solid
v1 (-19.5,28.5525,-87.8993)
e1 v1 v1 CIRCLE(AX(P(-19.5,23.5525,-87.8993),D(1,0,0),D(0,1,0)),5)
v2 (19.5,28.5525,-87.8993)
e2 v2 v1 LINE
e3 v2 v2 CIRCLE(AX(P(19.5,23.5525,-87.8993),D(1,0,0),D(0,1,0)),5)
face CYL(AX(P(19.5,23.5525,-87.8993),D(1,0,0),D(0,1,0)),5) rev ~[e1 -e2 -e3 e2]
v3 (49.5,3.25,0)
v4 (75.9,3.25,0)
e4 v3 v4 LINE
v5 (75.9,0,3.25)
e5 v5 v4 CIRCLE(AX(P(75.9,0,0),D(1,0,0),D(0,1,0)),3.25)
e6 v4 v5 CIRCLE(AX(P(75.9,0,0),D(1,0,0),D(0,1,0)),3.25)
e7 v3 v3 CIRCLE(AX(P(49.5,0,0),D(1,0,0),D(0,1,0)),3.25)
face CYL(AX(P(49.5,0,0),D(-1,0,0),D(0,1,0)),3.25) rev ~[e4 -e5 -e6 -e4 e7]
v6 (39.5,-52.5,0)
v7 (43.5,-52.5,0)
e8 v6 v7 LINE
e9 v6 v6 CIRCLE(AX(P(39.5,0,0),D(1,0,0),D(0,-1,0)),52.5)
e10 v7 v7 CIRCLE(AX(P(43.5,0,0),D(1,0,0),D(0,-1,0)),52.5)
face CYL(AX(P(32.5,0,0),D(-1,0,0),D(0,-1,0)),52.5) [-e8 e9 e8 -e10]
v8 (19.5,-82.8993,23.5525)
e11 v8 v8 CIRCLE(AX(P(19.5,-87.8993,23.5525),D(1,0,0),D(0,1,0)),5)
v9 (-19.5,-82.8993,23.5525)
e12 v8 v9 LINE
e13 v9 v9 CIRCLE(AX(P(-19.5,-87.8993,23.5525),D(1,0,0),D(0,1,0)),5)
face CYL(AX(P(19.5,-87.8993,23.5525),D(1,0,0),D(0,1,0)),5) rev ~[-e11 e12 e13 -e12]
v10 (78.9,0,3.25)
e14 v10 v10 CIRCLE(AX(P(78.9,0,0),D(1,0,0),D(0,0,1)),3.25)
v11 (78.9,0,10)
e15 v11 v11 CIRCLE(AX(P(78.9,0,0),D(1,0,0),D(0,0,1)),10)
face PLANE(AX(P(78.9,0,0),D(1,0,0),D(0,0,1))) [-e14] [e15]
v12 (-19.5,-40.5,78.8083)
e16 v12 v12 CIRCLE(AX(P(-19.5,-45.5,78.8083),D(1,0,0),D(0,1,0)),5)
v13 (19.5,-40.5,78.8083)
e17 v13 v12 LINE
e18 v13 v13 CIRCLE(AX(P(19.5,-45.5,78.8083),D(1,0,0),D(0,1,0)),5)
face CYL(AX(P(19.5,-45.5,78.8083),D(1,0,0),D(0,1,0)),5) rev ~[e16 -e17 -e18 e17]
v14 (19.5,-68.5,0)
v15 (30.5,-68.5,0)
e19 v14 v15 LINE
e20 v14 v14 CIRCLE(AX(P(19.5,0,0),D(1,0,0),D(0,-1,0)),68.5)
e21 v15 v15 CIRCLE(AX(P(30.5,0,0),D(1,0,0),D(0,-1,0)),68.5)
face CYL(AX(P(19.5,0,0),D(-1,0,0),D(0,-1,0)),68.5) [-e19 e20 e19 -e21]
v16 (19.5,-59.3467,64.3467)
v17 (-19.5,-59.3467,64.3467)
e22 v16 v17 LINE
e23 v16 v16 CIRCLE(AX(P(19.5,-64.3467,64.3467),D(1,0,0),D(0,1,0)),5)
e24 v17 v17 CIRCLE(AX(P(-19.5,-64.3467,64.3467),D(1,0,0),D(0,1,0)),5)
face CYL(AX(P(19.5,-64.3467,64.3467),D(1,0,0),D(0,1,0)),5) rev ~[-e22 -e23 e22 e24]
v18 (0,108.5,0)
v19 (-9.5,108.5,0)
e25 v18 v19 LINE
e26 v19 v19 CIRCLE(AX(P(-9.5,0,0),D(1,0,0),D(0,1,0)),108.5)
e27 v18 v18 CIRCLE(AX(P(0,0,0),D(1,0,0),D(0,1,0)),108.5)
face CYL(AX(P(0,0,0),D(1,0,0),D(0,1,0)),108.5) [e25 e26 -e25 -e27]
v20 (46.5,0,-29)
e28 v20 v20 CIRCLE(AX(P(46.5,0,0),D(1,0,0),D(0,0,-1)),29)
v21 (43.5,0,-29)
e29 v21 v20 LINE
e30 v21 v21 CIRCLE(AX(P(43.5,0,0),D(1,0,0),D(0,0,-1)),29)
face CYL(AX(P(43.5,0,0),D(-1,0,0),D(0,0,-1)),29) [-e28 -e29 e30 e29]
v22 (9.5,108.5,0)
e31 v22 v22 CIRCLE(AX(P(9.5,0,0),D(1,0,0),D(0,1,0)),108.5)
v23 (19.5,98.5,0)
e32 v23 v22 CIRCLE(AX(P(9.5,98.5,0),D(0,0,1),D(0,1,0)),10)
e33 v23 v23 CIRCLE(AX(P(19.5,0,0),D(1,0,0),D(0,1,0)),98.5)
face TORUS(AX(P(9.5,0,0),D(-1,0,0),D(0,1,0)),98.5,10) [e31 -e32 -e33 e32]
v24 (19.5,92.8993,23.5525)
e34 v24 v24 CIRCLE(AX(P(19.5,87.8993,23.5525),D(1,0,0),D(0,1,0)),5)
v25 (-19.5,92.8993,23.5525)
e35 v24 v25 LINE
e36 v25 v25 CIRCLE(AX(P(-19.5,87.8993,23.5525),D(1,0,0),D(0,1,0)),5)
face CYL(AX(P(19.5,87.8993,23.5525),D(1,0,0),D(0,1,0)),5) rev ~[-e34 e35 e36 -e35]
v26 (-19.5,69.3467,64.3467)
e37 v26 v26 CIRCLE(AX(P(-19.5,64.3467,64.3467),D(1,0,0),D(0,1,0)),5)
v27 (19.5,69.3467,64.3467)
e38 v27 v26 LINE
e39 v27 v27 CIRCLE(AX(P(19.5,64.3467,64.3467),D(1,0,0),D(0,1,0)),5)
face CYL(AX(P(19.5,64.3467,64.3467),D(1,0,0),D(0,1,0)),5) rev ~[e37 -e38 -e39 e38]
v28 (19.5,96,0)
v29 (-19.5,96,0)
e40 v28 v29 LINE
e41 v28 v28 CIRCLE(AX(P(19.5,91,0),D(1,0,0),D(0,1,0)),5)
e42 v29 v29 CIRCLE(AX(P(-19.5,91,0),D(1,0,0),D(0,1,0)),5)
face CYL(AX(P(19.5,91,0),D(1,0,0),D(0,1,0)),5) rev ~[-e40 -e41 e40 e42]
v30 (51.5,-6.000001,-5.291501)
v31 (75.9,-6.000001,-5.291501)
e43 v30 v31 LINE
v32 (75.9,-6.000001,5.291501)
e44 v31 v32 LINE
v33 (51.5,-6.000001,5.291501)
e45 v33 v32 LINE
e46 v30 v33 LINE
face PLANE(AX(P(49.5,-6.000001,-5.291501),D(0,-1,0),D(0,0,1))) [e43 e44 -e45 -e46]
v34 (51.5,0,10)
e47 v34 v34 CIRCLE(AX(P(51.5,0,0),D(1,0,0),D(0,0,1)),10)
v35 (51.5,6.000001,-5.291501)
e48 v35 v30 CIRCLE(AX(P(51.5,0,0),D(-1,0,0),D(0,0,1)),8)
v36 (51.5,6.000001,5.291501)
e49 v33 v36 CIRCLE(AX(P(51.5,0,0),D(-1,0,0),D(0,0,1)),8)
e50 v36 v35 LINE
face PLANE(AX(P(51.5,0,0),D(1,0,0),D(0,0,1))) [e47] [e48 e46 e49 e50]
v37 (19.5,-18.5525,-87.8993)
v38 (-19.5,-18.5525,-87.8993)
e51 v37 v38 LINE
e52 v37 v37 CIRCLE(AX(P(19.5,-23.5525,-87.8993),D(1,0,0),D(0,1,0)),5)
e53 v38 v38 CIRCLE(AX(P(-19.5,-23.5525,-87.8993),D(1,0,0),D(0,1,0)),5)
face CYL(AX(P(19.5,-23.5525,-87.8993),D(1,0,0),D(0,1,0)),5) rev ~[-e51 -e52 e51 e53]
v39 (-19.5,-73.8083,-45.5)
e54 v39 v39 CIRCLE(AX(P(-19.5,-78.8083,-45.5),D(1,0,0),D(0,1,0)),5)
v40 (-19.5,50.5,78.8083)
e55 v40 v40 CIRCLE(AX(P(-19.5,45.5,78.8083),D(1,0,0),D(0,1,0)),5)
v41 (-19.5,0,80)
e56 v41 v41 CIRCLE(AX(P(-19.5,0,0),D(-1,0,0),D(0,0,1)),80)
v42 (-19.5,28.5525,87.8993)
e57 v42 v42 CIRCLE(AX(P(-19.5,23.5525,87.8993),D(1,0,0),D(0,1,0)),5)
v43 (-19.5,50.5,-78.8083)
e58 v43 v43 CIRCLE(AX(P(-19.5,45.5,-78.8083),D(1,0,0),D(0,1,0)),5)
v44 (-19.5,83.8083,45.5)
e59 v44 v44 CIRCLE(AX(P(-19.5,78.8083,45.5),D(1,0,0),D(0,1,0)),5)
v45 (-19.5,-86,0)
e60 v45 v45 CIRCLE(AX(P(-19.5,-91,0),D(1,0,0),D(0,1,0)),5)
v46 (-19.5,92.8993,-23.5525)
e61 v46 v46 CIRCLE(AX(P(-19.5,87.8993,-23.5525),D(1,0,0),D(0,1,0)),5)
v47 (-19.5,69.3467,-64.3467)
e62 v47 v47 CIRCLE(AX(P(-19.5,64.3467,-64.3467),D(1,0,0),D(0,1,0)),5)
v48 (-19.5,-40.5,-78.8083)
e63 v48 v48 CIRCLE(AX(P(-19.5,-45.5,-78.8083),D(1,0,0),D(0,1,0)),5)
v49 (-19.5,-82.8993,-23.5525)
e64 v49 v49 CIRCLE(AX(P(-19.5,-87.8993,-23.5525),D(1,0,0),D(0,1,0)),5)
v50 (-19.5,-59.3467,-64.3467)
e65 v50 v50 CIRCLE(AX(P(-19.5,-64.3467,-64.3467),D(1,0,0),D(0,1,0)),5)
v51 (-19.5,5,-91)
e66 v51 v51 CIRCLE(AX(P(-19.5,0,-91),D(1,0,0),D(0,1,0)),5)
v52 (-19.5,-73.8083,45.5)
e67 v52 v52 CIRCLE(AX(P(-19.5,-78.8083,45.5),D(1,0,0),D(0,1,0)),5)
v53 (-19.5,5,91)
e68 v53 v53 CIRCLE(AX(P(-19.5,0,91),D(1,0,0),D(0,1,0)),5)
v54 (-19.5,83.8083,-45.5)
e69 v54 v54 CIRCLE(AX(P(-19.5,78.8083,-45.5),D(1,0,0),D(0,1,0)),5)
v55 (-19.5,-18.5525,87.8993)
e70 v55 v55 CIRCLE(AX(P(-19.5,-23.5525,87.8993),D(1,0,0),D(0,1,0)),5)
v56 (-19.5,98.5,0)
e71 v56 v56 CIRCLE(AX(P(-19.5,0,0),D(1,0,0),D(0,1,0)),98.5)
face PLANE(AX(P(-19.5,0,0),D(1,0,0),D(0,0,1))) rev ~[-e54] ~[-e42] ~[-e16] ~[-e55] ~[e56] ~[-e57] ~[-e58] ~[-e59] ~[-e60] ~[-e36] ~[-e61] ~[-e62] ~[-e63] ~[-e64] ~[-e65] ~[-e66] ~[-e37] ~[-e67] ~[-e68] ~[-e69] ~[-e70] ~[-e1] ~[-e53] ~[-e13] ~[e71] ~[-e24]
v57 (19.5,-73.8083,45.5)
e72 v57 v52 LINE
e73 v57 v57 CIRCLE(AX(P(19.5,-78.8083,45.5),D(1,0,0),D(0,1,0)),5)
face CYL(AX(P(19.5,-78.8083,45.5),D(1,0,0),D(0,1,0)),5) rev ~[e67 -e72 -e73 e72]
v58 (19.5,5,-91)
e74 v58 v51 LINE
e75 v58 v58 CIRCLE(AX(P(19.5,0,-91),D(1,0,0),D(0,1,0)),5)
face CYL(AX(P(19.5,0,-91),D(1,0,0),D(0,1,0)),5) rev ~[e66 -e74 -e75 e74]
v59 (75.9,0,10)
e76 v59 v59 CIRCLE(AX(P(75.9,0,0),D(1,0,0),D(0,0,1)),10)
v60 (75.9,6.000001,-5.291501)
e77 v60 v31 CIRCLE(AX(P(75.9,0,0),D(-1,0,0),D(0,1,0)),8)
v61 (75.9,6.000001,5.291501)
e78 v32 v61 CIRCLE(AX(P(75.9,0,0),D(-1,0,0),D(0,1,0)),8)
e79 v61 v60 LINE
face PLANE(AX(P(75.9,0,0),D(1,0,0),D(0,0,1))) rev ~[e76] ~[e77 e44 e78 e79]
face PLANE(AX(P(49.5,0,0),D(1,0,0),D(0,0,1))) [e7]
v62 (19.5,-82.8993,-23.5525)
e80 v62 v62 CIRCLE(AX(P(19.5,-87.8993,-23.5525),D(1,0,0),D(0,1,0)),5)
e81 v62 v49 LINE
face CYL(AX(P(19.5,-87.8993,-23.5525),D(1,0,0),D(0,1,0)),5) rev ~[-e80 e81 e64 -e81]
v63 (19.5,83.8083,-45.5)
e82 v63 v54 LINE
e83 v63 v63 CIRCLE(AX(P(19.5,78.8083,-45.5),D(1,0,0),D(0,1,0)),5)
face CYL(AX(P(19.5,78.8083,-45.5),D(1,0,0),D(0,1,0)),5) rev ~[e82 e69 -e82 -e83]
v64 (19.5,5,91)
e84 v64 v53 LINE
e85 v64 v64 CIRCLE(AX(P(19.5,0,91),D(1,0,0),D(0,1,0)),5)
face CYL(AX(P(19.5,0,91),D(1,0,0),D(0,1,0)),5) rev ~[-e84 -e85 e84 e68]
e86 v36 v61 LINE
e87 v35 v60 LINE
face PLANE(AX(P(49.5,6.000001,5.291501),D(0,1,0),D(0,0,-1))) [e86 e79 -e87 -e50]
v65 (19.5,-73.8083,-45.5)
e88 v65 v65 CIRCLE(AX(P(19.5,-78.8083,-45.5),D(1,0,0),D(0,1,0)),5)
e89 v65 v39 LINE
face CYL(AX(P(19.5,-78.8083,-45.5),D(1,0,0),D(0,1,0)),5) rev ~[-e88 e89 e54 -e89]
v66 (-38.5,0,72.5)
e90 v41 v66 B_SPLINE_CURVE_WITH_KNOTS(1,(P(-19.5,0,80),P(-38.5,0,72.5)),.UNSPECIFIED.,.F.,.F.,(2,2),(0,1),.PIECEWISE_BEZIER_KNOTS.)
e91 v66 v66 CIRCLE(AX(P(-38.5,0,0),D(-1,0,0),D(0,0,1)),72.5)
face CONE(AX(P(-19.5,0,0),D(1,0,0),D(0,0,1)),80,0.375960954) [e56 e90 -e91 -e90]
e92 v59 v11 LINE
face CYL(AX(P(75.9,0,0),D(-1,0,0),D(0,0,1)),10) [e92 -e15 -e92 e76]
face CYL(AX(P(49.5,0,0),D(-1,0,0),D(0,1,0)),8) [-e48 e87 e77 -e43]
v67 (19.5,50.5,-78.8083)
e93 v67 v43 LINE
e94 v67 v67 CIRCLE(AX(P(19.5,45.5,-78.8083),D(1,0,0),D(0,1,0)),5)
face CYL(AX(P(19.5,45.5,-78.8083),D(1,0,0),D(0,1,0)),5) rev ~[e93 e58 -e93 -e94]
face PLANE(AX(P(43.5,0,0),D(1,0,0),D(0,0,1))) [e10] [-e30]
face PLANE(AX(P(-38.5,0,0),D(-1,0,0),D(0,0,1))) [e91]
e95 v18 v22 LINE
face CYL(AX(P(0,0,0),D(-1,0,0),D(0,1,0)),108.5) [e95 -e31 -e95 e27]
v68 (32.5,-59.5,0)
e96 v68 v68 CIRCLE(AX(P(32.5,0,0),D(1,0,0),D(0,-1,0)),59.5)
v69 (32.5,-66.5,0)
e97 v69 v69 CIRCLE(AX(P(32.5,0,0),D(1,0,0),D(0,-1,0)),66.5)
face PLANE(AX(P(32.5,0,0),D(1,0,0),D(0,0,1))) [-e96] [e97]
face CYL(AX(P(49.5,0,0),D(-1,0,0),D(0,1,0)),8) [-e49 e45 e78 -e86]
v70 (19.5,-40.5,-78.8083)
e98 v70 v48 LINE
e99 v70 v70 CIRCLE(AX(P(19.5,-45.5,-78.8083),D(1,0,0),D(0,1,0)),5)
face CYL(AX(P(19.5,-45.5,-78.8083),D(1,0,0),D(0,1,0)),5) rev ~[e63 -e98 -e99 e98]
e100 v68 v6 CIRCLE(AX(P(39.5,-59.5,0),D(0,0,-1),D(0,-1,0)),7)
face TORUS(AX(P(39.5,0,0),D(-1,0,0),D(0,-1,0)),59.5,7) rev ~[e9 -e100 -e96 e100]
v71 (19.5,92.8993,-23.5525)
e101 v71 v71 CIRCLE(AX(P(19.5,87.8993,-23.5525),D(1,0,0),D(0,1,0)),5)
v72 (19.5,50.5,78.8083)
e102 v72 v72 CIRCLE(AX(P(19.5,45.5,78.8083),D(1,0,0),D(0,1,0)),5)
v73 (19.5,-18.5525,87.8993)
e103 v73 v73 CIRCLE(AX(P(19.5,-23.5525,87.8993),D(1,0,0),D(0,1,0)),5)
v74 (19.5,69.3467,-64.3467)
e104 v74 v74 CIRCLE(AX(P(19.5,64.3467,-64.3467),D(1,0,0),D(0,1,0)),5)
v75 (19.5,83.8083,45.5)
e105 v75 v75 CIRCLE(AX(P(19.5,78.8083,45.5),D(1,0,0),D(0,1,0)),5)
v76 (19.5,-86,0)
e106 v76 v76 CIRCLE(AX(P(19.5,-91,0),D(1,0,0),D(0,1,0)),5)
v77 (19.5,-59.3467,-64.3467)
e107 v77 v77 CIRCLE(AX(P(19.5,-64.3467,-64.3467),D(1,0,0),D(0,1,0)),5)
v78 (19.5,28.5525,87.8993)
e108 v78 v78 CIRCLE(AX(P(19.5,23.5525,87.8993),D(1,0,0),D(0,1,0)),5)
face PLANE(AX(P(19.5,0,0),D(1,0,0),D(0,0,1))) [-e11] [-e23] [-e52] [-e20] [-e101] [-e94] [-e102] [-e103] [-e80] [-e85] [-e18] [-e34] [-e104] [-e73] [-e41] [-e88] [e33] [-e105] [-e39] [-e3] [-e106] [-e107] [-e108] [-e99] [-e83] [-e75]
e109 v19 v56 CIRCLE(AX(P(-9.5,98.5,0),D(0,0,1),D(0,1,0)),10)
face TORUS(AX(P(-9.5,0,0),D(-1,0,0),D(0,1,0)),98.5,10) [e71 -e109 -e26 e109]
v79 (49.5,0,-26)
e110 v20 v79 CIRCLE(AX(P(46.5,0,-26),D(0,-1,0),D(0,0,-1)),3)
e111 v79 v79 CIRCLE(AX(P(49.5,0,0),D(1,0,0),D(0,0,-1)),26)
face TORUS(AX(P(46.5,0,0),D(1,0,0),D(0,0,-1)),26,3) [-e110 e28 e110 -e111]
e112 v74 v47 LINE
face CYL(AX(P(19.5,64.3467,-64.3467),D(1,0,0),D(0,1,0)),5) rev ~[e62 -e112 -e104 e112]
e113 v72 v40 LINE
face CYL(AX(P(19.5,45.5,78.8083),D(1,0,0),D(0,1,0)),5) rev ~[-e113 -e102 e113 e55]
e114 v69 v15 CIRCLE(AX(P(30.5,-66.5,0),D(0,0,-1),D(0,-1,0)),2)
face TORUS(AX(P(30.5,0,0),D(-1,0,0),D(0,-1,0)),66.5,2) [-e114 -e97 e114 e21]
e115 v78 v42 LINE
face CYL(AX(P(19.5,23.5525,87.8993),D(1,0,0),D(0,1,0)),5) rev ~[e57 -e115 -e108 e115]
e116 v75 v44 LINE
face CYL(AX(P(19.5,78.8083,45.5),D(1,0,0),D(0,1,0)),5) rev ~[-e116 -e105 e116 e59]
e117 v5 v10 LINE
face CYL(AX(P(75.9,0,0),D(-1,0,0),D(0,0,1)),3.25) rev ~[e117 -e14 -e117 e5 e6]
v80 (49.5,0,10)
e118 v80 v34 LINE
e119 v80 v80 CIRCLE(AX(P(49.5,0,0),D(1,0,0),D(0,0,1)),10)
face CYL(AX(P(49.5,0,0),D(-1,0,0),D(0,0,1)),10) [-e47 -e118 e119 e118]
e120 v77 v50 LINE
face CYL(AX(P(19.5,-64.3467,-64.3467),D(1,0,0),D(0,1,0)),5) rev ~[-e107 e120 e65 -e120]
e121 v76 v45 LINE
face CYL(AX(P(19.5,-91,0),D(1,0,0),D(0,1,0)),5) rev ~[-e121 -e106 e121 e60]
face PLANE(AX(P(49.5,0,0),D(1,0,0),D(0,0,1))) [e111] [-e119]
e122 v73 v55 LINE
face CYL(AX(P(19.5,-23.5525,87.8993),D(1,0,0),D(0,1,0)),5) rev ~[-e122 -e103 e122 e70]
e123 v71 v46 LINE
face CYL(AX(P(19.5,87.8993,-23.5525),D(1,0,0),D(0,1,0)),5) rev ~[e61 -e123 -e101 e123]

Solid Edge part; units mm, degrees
sketch "Sketch1" plane through (0, 0, 0) normal (1, 0, 0) x (0, 1, 0)
  circle A0 centre (0, 0) radius 108.5
extrude "Protrusion1" add sketch "Sketch1" along normal mid plane 39
sketch "Sketch2" plane through (-19.5, 0, 0) normal (-1, 0, 0) x (0, 0, 1)
  circle A0 centre (0, 0) radius 80
sketch "Sketch3" plane through (-38.5, 0, 0) normal (-1, 0, 0) x (0, 0, 1)
  circle A0 centre (0, 0) radius 72.5
loft "LoftedProtrusion1" add profiles "Sketch2", "Sketch3"
sketch "Sketch4" plane through (19.5, 0, 0) normal (1, 0, 0) x (0, -1, 0)
  circle A0 centre (0, 0) radius 68.5
extrude "inner_first_rim" add sketch "Sketch4" along normal blind 13
sketch "Sketch5" plane through (32.5, 0, 0) normal (1, 0, 0) x (0, -1, 0)
  circle A0 centre (0, 0) radius 52.5
extrude "Inner_last_rim" add sketch "Sketch5" along normal blind 11
fillet "round_outer_rim" radius 7 1 edges at (32.5, 52.5, 0)
fillet "Round_inner_rim" radius 2 1 edges at (32.5, 68.5, 0)
sketch "Sketch6" plane through (43.5, 0, 0) normal (1, 0, 0) x (0, 0, -1)
  circle A0 centre (0, 0) radius 29
extrude "inner_bracket" add sketch "Sketch6" along normal blind 6
fillet "Inner_bracket_round" radius 3 1 edges at (49.5, 0, 29)
sketch "Sketch7" plane through (49.5, 0, 0) normal (1, 0, 0) x (0, 1, 0)
  circle A0 centre (0, 0) radius 3.25
  line L0 (6, 5.2915) -> (6, -5.2915)
  arc A1 (-6, 5.2915) -> (6, 5.2915) centre (0, 0) cw
  line L1 (-6, -5.2915) -> (-6, 5.2915)
  arc A2 (6, -5.2915) -> (-6, -5.2915) centre (0, 0) cw
extrude "shaft" add sketch "Sketch7" along normal blind 26.4
sketch "Sketch8" plane through (49.5, 0, 0) normal (1, 0, 0) x (0, 0, 1)
  circle A0 centre (0, 0) radius 10
  line L0 (5.2915, -6) -> (-5.2915, -6)
  arc A1 (-5.2915, -6) -> (-5.2915, 6) centre (0, 0) cw
  line L1 (-5.2915, 6) -> (5.2915, 6)
  arc A2 (5.2915, 6) -> (5.2915, -6) centre (0, 0) cw
extrude "Shaft_inner_bracket" add sketch "Sketch8" along normal blind 2
sketch "Sketch9" plane through (75.9, 0, 0) normal (1, 0, 0) x (0, 0, 1)
  circle A0 centre (0, 0) radius 10
  circle A1 centre (0, 0) radius 3.25
extrude "Shaft_outer_bracket" add sketch "Sketch9" along normal blind 3
fillet "Wheel_round" radius 10 2 edges at (19.5, -108.5, 0) (-19.5, -108.5, 0)
sketch "Sketch10" plane through (19.5, 0, 0) normal (1, 0, 0) x (0, 1, 0)
  circle A0 centre (-78.8083, 45.5) radius 5
  circle A1 centre (-64.3467, 64.3467) radius 5
  circle A2 centre (-45.5, 78.8083) radius 5
  circle A3 centre (-23.5525, 87.8993) radius 5
  circle A4 centre (0, 91) radius 5
  circle A5 centre (23.5525, 87.8993) radius 5
  circle A6 centre (45.5, 78.8083) radius 5
  circle A7 centre (-87.8993, 23.5525) radius 5
  circle A8 centre (-91, 0) radius 5
  circle A9 centre (-87.8993, -23.5525) radius 5
  circle A10 centre (64.3467, 64.3467) radius 5
  circle A11 centre (78.8083, 45.5) radius 5
  circle A12 centre (87.8993, 23.5525) radius 5
  circle A13 centre (91, 0) radius 5
  circle A14 centre (87.8993, -23.5525) radius 5
  circle A15 centre (78.8083, -45.5) radius 5
  circle A16 centre (64.3467, -64.3467) radius 5
  circle A17 centre (45.5, -78.8083) radius 5
  circle A18 centre (23.5525, -87.8993) radius 5
  circle A19 centre (0, -91) radius 5
  circle A20 centre (-23.5525, -87.8993) radius 5
  circle A21 centre (-45.5, -78.8083) radius 5
  circle A22 centre (-64.3467, -64.3467) radius 5
  circle A23 centre (-78.8083, -45.5) radius 5
extrude "Cutout1" cut sketch "Sketch10" against normal through all
properties material "Aluminum, 1060"
